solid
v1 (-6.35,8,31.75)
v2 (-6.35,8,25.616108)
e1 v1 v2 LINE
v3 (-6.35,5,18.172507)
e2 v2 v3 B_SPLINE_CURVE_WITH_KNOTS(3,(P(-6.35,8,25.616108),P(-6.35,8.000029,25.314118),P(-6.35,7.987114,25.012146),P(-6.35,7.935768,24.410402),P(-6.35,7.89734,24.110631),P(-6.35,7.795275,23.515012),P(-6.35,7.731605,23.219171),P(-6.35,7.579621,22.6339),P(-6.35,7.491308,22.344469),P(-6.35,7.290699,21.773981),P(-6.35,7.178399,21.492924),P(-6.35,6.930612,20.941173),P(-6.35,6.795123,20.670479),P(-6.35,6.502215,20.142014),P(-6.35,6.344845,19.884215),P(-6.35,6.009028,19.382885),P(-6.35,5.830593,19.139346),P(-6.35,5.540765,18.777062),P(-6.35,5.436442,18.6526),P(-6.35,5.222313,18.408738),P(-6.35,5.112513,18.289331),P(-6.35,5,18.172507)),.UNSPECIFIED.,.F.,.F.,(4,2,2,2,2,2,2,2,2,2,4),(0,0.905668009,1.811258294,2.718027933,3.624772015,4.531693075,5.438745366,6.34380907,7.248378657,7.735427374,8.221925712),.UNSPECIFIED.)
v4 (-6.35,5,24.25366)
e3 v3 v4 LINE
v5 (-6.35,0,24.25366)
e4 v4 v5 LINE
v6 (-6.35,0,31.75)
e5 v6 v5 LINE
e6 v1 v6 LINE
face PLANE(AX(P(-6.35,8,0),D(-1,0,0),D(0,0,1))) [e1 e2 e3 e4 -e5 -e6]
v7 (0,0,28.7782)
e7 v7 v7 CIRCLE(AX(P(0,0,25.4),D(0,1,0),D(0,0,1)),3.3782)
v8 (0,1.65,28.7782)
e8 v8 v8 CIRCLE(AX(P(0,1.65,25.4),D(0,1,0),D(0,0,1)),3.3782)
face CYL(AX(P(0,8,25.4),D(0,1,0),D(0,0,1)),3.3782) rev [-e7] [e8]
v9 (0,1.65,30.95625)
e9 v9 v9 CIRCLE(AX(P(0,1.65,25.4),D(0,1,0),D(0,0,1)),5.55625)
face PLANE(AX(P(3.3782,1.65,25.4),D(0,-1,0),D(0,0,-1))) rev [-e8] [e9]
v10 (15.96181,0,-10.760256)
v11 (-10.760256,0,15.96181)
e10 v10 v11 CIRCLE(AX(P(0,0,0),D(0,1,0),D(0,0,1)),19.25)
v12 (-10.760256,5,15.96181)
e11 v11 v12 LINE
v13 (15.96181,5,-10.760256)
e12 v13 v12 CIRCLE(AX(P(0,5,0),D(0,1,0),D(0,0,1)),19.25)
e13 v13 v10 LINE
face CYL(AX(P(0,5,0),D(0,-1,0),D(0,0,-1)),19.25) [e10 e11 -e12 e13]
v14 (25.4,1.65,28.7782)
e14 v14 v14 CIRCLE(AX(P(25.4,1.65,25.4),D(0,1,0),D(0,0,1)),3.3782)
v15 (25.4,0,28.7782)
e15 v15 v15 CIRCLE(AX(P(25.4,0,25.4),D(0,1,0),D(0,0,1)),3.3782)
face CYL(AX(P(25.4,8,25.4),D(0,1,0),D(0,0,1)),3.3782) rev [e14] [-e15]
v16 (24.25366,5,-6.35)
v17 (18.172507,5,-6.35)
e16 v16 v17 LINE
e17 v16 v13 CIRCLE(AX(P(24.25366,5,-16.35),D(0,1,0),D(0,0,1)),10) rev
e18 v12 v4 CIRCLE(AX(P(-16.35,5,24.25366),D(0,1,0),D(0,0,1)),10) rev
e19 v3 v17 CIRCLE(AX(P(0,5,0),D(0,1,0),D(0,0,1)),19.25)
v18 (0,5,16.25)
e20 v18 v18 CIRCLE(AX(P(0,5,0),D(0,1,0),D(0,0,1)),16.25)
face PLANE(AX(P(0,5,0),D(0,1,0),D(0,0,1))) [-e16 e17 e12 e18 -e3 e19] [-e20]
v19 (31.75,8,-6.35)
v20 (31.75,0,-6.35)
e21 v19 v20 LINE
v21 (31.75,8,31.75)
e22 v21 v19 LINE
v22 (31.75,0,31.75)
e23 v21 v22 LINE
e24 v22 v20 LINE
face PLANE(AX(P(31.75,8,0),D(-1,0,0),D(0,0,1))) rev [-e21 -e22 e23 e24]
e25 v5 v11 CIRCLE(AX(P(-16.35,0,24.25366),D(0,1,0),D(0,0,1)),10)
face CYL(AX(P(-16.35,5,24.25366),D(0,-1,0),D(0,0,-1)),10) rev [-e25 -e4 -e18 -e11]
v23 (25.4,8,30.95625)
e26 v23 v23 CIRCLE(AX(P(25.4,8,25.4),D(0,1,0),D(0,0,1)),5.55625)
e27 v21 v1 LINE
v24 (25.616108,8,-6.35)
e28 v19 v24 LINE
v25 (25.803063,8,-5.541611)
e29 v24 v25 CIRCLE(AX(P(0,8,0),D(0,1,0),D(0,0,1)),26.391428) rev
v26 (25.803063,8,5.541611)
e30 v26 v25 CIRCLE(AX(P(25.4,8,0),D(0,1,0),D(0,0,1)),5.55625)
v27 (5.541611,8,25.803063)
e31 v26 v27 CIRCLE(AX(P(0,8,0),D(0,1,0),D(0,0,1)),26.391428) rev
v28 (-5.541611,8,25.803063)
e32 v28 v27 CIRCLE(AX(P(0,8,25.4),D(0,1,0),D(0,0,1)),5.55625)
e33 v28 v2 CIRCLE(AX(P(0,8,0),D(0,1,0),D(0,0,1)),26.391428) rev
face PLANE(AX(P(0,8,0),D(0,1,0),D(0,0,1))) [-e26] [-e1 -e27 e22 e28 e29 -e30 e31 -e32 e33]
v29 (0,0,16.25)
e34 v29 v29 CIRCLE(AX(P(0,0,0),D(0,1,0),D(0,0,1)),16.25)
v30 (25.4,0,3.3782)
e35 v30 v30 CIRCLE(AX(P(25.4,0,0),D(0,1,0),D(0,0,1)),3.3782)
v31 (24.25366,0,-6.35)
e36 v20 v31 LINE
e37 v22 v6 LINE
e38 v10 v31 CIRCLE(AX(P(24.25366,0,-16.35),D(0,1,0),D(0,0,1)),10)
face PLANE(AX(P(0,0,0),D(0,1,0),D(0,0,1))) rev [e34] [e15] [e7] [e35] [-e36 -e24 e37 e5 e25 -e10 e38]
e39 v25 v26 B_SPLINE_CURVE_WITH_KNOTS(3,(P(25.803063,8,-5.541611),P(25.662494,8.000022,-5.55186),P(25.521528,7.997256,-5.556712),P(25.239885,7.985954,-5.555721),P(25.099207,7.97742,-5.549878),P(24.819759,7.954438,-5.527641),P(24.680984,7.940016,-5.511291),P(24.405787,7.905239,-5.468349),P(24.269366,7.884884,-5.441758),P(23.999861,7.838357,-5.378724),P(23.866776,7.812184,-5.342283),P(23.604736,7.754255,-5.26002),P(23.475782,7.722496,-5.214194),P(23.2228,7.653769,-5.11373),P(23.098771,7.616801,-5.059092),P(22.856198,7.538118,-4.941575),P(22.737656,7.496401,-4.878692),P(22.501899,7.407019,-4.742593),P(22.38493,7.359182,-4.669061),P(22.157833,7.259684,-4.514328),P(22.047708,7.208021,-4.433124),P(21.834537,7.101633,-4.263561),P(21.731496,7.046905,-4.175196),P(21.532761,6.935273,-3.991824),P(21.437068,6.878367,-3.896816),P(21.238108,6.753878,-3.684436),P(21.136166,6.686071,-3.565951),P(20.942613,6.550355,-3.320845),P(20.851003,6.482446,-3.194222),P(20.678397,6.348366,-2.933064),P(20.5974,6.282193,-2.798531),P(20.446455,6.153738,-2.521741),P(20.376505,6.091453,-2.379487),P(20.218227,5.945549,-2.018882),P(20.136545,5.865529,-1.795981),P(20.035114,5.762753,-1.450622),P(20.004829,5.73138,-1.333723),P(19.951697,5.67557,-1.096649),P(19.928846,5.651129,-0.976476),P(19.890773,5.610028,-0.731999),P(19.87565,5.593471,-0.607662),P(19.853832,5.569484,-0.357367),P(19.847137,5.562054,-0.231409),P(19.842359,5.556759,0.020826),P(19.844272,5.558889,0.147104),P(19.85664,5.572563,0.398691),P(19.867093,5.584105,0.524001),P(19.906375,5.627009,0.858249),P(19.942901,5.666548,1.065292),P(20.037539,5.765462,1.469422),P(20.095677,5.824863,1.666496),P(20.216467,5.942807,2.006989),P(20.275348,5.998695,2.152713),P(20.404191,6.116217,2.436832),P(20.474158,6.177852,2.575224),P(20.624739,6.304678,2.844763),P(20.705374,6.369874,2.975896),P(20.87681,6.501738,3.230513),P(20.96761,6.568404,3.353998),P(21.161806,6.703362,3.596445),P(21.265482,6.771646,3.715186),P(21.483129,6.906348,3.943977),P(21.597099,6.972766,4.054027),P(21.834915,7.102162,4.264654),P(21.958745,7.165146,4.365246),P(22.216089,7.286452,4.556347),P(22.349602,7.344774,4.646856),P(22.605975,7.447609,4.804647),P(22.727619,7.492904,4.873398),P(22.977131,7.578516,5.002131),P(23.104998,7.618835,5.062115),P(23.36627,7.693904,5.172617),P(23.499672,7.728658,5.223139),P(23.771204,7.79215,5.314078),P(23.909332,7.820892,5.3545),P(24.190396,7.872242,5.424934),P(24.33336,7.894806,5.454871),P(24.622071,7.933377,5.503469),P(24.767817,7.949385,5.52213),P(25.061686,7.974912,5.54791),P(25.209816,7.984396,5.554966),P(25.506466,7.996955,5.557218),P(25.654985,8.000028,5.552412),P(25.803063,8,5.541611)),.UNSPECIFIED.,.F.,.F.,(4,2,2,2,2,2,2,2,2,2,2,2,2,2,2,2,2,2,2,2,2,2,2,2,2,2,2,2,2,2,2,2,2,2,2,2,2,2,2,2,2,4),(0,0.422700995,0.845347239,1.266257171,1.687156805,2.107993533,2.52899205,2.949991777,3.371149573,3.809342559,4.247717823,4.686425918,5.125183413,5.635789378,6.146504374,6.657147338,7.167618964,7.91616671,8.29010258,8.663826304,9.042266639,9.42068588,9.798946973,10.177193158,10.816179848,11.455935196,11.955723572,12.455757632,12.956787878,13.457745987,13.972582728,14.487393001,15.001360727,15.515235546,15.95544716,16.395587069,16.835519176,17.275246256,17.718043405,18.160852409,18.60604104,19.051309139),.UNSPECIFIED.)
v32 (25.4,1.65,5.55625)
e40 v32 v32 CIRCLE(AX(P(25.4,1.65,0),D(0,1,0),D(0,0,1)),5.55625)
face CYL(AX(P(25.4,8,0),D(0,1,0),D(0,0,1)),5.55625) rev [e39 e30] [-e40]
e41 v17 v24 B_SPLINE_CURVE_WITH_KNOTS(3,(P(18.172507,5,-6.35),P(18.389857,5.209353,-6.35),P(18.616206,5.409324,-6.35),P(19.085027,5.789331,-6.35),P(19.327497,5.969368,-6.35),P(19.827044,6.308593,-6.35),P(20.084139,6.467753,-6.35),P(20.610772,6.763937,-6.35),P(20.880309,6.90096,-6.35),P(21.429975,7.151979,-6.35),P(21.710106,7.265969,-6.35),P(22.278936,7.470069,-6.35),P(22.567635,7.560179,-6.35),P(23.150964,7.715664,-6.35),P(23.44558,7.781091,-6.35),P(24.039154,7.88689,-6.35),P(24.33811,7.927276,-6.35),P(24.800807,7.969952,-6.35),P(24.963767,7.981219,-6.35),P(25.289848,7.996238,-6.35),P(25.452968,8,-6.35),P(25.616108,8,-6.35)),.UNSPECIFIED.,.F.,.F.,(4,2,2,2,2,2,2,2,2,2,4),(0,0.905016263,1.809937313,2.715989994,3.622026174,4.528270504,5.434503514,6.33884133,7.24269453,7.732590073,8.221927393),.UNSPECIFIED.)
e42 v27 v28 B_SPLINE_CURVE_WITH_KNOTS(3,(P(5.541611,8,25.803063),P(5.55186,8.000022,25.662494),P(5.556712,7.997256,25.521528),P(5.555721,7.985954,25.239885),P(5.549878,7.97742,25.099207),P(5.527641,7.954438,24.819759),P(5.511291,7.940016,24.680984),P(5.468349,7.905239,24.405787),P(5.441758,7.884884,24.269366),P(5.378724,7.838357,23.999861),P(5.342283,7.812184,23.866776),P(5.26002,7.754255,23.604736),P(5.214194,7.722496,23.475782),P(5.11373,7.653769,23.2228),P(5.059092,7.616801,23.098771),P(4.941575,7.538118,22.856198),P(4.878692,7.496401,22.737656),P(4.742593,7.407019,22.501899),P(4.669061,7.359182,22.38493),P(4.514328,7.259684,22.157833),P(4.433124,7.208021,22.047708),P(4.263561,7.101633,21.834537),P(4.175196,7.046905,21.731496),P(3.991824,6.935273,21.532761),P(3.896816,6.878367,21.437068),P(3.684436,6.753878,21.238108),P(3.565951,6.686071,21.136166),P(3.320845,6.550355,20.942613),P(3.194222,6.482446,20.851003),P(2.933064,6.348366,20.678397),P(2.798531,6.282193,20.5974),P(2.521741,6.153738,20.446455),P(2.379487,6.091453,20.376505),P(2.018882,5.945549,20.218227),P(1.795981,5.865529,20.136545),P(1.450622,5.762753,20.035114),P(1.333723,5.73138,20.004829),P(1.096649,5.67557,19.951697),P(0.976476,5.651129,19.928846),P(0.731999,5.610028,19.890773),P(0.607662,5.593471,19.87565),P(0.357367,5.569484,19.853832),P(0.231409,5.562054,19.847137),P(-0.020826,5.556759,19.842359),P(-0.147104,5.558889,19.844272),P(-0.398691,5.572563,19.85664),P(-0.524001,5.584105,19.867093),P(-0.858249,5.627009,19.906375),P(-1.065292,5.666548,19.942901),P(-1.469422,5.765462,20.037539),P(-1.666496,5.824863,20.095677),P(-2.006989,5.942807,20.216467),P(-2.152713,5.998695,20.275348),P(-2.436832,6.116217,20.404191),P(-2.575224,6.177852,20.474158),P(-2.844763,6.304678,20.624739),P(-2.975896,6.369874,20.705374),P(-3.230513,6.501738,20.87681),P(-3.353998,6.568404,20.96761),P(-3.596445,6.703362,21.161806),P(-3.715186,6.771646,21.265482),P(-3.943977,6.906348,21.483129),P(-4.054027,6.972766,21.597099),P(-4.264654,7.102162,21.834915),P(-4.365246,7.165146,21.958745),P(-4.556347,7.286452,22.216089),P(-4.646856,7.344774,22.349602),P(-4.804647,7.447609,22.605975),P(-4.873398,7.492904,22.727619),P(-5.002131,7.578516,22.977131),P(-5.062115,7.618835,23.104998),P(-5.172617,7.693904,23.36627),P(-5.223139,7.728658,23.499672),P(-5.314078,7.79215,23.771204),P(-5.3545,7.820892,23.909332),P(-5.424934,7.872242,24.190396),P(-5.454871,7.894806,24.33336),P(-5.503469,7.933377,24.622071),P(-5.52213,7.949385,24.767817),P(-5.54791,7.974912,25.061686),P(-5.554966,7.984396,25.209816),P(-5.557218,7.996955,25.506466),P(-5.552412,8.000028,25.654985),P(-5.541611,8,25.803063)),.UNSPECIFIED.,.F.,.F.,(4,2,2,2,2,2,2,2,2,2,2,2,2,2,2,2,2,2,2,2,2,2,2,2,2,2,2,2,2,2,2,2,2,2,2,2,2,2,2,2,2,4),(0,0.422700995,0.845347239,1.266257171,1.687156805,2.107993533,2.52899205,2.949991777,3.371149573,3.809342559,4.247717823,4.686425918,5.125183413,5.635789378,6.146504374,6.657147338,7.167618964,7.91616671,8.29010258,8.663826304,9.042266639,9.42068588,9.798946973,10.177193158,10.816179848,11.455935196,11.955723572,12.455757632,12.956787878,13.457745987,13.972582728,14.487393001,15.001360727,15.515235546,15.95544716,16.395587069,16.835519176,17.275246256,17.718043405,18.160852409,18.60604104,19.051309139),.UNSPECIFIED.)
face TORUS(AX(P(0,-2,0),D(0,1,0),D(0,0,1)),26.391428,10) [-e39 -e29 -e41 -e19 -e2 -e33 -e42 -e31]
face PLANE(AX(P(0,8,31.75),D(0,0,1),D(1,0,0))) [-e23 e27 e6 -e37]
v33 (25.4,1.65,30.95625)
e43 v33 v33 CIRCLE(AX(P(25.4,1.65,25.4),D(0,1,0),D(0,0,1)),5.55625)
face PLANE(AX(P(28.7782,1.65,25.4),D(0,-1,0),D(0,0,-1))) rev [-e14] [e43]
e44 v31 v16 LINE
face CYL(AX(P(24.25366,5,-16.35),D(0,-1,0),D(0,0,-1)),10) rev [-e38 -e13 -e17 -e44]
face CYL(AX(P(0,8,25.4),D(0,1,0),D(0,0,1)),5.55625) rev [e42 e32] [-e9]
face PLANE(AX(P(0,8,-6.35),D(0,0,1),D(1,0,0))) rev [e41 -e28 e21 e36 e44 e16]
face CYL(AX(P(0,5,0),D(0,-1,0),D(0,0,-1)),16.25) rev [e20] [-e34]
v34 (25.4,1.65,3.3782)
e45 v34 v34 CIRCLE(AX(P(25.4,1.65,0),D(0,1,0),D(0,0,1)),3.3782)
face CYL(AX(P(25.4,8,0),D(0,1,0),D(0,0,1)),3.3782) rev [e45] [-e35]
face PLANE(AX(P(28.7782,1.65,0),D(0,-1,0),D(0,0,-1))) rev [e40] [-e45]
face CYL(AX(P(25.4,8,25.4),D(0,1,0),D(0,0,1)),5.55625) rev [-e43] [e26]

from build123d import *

# Parameters (mm, degrees)
SKETCH1_R                                        = 19.25
SKETCH1_R_2                                      = 16.25
BOSS_EXTRUDE1_DEPTH                              = 5
BOSS_EXTRUDE2_DEPTH                              = 8
CBORE_FOR_1_4_SOCKET_HEAD_CAP_SCREW2_D           = 6.7564
CBORE_FOR_1_4_SOCKET_HEAD_CAP_SCREW2_CBORE_D     = 11.1125
CBORE_FOR_1_4_SOCKET_HEAD_CAP_SCREW2_CBORE_DEPTH = 6.35
FILLET1_R                                        = 10


with BuildPart() as part:
    # Sketch1 → Boss-Extrude1 (new body)
    with BuildSketch(Plane(origin=(0, 0, 0), x_dir=(1, 0, 0), z_dir=(0, 1, 0))):
        with Locations(Location((0, 0, 0), (0, 0, 270))):
            Circle(SKETCH1_R)
        with Locations(Location((0, 0, 0), (0, 0, 270))):
            Circle(SKETCH1_R_2, mode=Mode.SUBTRACT)
    extrude(amount=BOSS_EXTRUDE1_DEPTH)

    # Sketch2 → Boss-Extrude2 (add)
    with BuildSketch(Plane(origin=(0, 0, 0), x_dir=(1, 0, 0), z_dir=(0, 1, 0))):
        with BuildLine():
            Line((-6.35, -31.75), (31.75, -31.75))
            Line((31.75, -31.75), (31.75, 6.35))
            Line((31.75, 6.35), (18.172506707, 6.35))
            ThreePointArc((18.172506707, 6.35), (18.978715105, 3.220383975), (19.25, 0))
            ThreePointArc((19.25, 0), (11.142822802, -15.697133496), (-6.35, -18.172506707))
            Line((-6.35, -18.172506707), (-6.35, -31.75))
        make_face()
    extrude(amount=BOSS_EXTRUDE2_DEPTH)

    # CBORE for 1/4 Socket Head Cap Screw2 (through all)
    with Locations(Plane(origin=(0, 8, 0), x_dir=(1, 0, 0), z_dir=(0, 1, 0))):
        with Locations((0, -25.4), (25.4, -25.4), (25.4, 0)):
            CounterBoreHole(CBORE_FOR_1_4_SOCKET_HEAD_CAP_SCREW2_D / 2, CBORE_FOR_1_4_SOCKET_HEAD_CAP_SCREW2_CBORE_D / 2, CBORE_FOR_1_4_SOCKET_HEAD_CAP_SCREW2_CBORE_DEPTH)

    # Fillet1
    # the kernel refuses this fillet: 10 mm, written as the material it adds along each edge
    with BuildSketch(Plane(origin=(18.172506707, 0, -6.35), x_dir=(-0.4481163543899531, 0, -0.8939752417870743), z_dir=(0, 1, 0))) as fillet1_piece_1:
        with BuildLine():
            CenterArc((6.21468839, -9.917563599), FILLET1_R, 97.362002187, 56.015102529)
            Line((-2.725064028, -5.436400055), (0, 0))
            ThreePointArc((0, 0), (2.46665467, -0.158690073), (4.93330934, 0))
        make_face()
    extrude(amount=5)
    with BuildSketch(Plane(origin=(-6.35, 0, 18.172506707), x_dir=(-0.8939752417870848, 0, -0.44811635438993225), z_dir=(0, 1, 0))) as fillet1_piece_2:
        with BuildLine():
            CenterArc((6.21468839, 9.917563599), FILLET1_R, 206.622895283, 56.015102529)
            Line((-2.725064028, 5.436400055), (0, 0))
            ThreePointArc((0, 0), (2.46665467, 0.158690073), (4.93330934, 0))
        make_face()
    extrude(amount=5)
    # the kernel refuses this fillet: 10 mm, written as the material it takes off along each edge
    with BuildSketch(Plane(origin=(0, 8, 0), x_dir=(-0.9534219544060213, 0, 0.3016398131159126), z_dir=(-0.3016398131159126, 0, -0.9534219544060213))) as fillet1_2_piece_1:
        with BuildLine():
            CenterArc((26.391428429, -10), FILLET1_R, 90, 45.572995999)
            Line((26.391428429, 0), (19.25, 0))
            Line((19.25, 0), (19.25, -3))
        make_face()
    revolve(axis=Axis((0, 8, 0), (0, 1, 0)), revolution_arc=234.887758498, mode=Mode.SUBTRACT)


solid = part.part
